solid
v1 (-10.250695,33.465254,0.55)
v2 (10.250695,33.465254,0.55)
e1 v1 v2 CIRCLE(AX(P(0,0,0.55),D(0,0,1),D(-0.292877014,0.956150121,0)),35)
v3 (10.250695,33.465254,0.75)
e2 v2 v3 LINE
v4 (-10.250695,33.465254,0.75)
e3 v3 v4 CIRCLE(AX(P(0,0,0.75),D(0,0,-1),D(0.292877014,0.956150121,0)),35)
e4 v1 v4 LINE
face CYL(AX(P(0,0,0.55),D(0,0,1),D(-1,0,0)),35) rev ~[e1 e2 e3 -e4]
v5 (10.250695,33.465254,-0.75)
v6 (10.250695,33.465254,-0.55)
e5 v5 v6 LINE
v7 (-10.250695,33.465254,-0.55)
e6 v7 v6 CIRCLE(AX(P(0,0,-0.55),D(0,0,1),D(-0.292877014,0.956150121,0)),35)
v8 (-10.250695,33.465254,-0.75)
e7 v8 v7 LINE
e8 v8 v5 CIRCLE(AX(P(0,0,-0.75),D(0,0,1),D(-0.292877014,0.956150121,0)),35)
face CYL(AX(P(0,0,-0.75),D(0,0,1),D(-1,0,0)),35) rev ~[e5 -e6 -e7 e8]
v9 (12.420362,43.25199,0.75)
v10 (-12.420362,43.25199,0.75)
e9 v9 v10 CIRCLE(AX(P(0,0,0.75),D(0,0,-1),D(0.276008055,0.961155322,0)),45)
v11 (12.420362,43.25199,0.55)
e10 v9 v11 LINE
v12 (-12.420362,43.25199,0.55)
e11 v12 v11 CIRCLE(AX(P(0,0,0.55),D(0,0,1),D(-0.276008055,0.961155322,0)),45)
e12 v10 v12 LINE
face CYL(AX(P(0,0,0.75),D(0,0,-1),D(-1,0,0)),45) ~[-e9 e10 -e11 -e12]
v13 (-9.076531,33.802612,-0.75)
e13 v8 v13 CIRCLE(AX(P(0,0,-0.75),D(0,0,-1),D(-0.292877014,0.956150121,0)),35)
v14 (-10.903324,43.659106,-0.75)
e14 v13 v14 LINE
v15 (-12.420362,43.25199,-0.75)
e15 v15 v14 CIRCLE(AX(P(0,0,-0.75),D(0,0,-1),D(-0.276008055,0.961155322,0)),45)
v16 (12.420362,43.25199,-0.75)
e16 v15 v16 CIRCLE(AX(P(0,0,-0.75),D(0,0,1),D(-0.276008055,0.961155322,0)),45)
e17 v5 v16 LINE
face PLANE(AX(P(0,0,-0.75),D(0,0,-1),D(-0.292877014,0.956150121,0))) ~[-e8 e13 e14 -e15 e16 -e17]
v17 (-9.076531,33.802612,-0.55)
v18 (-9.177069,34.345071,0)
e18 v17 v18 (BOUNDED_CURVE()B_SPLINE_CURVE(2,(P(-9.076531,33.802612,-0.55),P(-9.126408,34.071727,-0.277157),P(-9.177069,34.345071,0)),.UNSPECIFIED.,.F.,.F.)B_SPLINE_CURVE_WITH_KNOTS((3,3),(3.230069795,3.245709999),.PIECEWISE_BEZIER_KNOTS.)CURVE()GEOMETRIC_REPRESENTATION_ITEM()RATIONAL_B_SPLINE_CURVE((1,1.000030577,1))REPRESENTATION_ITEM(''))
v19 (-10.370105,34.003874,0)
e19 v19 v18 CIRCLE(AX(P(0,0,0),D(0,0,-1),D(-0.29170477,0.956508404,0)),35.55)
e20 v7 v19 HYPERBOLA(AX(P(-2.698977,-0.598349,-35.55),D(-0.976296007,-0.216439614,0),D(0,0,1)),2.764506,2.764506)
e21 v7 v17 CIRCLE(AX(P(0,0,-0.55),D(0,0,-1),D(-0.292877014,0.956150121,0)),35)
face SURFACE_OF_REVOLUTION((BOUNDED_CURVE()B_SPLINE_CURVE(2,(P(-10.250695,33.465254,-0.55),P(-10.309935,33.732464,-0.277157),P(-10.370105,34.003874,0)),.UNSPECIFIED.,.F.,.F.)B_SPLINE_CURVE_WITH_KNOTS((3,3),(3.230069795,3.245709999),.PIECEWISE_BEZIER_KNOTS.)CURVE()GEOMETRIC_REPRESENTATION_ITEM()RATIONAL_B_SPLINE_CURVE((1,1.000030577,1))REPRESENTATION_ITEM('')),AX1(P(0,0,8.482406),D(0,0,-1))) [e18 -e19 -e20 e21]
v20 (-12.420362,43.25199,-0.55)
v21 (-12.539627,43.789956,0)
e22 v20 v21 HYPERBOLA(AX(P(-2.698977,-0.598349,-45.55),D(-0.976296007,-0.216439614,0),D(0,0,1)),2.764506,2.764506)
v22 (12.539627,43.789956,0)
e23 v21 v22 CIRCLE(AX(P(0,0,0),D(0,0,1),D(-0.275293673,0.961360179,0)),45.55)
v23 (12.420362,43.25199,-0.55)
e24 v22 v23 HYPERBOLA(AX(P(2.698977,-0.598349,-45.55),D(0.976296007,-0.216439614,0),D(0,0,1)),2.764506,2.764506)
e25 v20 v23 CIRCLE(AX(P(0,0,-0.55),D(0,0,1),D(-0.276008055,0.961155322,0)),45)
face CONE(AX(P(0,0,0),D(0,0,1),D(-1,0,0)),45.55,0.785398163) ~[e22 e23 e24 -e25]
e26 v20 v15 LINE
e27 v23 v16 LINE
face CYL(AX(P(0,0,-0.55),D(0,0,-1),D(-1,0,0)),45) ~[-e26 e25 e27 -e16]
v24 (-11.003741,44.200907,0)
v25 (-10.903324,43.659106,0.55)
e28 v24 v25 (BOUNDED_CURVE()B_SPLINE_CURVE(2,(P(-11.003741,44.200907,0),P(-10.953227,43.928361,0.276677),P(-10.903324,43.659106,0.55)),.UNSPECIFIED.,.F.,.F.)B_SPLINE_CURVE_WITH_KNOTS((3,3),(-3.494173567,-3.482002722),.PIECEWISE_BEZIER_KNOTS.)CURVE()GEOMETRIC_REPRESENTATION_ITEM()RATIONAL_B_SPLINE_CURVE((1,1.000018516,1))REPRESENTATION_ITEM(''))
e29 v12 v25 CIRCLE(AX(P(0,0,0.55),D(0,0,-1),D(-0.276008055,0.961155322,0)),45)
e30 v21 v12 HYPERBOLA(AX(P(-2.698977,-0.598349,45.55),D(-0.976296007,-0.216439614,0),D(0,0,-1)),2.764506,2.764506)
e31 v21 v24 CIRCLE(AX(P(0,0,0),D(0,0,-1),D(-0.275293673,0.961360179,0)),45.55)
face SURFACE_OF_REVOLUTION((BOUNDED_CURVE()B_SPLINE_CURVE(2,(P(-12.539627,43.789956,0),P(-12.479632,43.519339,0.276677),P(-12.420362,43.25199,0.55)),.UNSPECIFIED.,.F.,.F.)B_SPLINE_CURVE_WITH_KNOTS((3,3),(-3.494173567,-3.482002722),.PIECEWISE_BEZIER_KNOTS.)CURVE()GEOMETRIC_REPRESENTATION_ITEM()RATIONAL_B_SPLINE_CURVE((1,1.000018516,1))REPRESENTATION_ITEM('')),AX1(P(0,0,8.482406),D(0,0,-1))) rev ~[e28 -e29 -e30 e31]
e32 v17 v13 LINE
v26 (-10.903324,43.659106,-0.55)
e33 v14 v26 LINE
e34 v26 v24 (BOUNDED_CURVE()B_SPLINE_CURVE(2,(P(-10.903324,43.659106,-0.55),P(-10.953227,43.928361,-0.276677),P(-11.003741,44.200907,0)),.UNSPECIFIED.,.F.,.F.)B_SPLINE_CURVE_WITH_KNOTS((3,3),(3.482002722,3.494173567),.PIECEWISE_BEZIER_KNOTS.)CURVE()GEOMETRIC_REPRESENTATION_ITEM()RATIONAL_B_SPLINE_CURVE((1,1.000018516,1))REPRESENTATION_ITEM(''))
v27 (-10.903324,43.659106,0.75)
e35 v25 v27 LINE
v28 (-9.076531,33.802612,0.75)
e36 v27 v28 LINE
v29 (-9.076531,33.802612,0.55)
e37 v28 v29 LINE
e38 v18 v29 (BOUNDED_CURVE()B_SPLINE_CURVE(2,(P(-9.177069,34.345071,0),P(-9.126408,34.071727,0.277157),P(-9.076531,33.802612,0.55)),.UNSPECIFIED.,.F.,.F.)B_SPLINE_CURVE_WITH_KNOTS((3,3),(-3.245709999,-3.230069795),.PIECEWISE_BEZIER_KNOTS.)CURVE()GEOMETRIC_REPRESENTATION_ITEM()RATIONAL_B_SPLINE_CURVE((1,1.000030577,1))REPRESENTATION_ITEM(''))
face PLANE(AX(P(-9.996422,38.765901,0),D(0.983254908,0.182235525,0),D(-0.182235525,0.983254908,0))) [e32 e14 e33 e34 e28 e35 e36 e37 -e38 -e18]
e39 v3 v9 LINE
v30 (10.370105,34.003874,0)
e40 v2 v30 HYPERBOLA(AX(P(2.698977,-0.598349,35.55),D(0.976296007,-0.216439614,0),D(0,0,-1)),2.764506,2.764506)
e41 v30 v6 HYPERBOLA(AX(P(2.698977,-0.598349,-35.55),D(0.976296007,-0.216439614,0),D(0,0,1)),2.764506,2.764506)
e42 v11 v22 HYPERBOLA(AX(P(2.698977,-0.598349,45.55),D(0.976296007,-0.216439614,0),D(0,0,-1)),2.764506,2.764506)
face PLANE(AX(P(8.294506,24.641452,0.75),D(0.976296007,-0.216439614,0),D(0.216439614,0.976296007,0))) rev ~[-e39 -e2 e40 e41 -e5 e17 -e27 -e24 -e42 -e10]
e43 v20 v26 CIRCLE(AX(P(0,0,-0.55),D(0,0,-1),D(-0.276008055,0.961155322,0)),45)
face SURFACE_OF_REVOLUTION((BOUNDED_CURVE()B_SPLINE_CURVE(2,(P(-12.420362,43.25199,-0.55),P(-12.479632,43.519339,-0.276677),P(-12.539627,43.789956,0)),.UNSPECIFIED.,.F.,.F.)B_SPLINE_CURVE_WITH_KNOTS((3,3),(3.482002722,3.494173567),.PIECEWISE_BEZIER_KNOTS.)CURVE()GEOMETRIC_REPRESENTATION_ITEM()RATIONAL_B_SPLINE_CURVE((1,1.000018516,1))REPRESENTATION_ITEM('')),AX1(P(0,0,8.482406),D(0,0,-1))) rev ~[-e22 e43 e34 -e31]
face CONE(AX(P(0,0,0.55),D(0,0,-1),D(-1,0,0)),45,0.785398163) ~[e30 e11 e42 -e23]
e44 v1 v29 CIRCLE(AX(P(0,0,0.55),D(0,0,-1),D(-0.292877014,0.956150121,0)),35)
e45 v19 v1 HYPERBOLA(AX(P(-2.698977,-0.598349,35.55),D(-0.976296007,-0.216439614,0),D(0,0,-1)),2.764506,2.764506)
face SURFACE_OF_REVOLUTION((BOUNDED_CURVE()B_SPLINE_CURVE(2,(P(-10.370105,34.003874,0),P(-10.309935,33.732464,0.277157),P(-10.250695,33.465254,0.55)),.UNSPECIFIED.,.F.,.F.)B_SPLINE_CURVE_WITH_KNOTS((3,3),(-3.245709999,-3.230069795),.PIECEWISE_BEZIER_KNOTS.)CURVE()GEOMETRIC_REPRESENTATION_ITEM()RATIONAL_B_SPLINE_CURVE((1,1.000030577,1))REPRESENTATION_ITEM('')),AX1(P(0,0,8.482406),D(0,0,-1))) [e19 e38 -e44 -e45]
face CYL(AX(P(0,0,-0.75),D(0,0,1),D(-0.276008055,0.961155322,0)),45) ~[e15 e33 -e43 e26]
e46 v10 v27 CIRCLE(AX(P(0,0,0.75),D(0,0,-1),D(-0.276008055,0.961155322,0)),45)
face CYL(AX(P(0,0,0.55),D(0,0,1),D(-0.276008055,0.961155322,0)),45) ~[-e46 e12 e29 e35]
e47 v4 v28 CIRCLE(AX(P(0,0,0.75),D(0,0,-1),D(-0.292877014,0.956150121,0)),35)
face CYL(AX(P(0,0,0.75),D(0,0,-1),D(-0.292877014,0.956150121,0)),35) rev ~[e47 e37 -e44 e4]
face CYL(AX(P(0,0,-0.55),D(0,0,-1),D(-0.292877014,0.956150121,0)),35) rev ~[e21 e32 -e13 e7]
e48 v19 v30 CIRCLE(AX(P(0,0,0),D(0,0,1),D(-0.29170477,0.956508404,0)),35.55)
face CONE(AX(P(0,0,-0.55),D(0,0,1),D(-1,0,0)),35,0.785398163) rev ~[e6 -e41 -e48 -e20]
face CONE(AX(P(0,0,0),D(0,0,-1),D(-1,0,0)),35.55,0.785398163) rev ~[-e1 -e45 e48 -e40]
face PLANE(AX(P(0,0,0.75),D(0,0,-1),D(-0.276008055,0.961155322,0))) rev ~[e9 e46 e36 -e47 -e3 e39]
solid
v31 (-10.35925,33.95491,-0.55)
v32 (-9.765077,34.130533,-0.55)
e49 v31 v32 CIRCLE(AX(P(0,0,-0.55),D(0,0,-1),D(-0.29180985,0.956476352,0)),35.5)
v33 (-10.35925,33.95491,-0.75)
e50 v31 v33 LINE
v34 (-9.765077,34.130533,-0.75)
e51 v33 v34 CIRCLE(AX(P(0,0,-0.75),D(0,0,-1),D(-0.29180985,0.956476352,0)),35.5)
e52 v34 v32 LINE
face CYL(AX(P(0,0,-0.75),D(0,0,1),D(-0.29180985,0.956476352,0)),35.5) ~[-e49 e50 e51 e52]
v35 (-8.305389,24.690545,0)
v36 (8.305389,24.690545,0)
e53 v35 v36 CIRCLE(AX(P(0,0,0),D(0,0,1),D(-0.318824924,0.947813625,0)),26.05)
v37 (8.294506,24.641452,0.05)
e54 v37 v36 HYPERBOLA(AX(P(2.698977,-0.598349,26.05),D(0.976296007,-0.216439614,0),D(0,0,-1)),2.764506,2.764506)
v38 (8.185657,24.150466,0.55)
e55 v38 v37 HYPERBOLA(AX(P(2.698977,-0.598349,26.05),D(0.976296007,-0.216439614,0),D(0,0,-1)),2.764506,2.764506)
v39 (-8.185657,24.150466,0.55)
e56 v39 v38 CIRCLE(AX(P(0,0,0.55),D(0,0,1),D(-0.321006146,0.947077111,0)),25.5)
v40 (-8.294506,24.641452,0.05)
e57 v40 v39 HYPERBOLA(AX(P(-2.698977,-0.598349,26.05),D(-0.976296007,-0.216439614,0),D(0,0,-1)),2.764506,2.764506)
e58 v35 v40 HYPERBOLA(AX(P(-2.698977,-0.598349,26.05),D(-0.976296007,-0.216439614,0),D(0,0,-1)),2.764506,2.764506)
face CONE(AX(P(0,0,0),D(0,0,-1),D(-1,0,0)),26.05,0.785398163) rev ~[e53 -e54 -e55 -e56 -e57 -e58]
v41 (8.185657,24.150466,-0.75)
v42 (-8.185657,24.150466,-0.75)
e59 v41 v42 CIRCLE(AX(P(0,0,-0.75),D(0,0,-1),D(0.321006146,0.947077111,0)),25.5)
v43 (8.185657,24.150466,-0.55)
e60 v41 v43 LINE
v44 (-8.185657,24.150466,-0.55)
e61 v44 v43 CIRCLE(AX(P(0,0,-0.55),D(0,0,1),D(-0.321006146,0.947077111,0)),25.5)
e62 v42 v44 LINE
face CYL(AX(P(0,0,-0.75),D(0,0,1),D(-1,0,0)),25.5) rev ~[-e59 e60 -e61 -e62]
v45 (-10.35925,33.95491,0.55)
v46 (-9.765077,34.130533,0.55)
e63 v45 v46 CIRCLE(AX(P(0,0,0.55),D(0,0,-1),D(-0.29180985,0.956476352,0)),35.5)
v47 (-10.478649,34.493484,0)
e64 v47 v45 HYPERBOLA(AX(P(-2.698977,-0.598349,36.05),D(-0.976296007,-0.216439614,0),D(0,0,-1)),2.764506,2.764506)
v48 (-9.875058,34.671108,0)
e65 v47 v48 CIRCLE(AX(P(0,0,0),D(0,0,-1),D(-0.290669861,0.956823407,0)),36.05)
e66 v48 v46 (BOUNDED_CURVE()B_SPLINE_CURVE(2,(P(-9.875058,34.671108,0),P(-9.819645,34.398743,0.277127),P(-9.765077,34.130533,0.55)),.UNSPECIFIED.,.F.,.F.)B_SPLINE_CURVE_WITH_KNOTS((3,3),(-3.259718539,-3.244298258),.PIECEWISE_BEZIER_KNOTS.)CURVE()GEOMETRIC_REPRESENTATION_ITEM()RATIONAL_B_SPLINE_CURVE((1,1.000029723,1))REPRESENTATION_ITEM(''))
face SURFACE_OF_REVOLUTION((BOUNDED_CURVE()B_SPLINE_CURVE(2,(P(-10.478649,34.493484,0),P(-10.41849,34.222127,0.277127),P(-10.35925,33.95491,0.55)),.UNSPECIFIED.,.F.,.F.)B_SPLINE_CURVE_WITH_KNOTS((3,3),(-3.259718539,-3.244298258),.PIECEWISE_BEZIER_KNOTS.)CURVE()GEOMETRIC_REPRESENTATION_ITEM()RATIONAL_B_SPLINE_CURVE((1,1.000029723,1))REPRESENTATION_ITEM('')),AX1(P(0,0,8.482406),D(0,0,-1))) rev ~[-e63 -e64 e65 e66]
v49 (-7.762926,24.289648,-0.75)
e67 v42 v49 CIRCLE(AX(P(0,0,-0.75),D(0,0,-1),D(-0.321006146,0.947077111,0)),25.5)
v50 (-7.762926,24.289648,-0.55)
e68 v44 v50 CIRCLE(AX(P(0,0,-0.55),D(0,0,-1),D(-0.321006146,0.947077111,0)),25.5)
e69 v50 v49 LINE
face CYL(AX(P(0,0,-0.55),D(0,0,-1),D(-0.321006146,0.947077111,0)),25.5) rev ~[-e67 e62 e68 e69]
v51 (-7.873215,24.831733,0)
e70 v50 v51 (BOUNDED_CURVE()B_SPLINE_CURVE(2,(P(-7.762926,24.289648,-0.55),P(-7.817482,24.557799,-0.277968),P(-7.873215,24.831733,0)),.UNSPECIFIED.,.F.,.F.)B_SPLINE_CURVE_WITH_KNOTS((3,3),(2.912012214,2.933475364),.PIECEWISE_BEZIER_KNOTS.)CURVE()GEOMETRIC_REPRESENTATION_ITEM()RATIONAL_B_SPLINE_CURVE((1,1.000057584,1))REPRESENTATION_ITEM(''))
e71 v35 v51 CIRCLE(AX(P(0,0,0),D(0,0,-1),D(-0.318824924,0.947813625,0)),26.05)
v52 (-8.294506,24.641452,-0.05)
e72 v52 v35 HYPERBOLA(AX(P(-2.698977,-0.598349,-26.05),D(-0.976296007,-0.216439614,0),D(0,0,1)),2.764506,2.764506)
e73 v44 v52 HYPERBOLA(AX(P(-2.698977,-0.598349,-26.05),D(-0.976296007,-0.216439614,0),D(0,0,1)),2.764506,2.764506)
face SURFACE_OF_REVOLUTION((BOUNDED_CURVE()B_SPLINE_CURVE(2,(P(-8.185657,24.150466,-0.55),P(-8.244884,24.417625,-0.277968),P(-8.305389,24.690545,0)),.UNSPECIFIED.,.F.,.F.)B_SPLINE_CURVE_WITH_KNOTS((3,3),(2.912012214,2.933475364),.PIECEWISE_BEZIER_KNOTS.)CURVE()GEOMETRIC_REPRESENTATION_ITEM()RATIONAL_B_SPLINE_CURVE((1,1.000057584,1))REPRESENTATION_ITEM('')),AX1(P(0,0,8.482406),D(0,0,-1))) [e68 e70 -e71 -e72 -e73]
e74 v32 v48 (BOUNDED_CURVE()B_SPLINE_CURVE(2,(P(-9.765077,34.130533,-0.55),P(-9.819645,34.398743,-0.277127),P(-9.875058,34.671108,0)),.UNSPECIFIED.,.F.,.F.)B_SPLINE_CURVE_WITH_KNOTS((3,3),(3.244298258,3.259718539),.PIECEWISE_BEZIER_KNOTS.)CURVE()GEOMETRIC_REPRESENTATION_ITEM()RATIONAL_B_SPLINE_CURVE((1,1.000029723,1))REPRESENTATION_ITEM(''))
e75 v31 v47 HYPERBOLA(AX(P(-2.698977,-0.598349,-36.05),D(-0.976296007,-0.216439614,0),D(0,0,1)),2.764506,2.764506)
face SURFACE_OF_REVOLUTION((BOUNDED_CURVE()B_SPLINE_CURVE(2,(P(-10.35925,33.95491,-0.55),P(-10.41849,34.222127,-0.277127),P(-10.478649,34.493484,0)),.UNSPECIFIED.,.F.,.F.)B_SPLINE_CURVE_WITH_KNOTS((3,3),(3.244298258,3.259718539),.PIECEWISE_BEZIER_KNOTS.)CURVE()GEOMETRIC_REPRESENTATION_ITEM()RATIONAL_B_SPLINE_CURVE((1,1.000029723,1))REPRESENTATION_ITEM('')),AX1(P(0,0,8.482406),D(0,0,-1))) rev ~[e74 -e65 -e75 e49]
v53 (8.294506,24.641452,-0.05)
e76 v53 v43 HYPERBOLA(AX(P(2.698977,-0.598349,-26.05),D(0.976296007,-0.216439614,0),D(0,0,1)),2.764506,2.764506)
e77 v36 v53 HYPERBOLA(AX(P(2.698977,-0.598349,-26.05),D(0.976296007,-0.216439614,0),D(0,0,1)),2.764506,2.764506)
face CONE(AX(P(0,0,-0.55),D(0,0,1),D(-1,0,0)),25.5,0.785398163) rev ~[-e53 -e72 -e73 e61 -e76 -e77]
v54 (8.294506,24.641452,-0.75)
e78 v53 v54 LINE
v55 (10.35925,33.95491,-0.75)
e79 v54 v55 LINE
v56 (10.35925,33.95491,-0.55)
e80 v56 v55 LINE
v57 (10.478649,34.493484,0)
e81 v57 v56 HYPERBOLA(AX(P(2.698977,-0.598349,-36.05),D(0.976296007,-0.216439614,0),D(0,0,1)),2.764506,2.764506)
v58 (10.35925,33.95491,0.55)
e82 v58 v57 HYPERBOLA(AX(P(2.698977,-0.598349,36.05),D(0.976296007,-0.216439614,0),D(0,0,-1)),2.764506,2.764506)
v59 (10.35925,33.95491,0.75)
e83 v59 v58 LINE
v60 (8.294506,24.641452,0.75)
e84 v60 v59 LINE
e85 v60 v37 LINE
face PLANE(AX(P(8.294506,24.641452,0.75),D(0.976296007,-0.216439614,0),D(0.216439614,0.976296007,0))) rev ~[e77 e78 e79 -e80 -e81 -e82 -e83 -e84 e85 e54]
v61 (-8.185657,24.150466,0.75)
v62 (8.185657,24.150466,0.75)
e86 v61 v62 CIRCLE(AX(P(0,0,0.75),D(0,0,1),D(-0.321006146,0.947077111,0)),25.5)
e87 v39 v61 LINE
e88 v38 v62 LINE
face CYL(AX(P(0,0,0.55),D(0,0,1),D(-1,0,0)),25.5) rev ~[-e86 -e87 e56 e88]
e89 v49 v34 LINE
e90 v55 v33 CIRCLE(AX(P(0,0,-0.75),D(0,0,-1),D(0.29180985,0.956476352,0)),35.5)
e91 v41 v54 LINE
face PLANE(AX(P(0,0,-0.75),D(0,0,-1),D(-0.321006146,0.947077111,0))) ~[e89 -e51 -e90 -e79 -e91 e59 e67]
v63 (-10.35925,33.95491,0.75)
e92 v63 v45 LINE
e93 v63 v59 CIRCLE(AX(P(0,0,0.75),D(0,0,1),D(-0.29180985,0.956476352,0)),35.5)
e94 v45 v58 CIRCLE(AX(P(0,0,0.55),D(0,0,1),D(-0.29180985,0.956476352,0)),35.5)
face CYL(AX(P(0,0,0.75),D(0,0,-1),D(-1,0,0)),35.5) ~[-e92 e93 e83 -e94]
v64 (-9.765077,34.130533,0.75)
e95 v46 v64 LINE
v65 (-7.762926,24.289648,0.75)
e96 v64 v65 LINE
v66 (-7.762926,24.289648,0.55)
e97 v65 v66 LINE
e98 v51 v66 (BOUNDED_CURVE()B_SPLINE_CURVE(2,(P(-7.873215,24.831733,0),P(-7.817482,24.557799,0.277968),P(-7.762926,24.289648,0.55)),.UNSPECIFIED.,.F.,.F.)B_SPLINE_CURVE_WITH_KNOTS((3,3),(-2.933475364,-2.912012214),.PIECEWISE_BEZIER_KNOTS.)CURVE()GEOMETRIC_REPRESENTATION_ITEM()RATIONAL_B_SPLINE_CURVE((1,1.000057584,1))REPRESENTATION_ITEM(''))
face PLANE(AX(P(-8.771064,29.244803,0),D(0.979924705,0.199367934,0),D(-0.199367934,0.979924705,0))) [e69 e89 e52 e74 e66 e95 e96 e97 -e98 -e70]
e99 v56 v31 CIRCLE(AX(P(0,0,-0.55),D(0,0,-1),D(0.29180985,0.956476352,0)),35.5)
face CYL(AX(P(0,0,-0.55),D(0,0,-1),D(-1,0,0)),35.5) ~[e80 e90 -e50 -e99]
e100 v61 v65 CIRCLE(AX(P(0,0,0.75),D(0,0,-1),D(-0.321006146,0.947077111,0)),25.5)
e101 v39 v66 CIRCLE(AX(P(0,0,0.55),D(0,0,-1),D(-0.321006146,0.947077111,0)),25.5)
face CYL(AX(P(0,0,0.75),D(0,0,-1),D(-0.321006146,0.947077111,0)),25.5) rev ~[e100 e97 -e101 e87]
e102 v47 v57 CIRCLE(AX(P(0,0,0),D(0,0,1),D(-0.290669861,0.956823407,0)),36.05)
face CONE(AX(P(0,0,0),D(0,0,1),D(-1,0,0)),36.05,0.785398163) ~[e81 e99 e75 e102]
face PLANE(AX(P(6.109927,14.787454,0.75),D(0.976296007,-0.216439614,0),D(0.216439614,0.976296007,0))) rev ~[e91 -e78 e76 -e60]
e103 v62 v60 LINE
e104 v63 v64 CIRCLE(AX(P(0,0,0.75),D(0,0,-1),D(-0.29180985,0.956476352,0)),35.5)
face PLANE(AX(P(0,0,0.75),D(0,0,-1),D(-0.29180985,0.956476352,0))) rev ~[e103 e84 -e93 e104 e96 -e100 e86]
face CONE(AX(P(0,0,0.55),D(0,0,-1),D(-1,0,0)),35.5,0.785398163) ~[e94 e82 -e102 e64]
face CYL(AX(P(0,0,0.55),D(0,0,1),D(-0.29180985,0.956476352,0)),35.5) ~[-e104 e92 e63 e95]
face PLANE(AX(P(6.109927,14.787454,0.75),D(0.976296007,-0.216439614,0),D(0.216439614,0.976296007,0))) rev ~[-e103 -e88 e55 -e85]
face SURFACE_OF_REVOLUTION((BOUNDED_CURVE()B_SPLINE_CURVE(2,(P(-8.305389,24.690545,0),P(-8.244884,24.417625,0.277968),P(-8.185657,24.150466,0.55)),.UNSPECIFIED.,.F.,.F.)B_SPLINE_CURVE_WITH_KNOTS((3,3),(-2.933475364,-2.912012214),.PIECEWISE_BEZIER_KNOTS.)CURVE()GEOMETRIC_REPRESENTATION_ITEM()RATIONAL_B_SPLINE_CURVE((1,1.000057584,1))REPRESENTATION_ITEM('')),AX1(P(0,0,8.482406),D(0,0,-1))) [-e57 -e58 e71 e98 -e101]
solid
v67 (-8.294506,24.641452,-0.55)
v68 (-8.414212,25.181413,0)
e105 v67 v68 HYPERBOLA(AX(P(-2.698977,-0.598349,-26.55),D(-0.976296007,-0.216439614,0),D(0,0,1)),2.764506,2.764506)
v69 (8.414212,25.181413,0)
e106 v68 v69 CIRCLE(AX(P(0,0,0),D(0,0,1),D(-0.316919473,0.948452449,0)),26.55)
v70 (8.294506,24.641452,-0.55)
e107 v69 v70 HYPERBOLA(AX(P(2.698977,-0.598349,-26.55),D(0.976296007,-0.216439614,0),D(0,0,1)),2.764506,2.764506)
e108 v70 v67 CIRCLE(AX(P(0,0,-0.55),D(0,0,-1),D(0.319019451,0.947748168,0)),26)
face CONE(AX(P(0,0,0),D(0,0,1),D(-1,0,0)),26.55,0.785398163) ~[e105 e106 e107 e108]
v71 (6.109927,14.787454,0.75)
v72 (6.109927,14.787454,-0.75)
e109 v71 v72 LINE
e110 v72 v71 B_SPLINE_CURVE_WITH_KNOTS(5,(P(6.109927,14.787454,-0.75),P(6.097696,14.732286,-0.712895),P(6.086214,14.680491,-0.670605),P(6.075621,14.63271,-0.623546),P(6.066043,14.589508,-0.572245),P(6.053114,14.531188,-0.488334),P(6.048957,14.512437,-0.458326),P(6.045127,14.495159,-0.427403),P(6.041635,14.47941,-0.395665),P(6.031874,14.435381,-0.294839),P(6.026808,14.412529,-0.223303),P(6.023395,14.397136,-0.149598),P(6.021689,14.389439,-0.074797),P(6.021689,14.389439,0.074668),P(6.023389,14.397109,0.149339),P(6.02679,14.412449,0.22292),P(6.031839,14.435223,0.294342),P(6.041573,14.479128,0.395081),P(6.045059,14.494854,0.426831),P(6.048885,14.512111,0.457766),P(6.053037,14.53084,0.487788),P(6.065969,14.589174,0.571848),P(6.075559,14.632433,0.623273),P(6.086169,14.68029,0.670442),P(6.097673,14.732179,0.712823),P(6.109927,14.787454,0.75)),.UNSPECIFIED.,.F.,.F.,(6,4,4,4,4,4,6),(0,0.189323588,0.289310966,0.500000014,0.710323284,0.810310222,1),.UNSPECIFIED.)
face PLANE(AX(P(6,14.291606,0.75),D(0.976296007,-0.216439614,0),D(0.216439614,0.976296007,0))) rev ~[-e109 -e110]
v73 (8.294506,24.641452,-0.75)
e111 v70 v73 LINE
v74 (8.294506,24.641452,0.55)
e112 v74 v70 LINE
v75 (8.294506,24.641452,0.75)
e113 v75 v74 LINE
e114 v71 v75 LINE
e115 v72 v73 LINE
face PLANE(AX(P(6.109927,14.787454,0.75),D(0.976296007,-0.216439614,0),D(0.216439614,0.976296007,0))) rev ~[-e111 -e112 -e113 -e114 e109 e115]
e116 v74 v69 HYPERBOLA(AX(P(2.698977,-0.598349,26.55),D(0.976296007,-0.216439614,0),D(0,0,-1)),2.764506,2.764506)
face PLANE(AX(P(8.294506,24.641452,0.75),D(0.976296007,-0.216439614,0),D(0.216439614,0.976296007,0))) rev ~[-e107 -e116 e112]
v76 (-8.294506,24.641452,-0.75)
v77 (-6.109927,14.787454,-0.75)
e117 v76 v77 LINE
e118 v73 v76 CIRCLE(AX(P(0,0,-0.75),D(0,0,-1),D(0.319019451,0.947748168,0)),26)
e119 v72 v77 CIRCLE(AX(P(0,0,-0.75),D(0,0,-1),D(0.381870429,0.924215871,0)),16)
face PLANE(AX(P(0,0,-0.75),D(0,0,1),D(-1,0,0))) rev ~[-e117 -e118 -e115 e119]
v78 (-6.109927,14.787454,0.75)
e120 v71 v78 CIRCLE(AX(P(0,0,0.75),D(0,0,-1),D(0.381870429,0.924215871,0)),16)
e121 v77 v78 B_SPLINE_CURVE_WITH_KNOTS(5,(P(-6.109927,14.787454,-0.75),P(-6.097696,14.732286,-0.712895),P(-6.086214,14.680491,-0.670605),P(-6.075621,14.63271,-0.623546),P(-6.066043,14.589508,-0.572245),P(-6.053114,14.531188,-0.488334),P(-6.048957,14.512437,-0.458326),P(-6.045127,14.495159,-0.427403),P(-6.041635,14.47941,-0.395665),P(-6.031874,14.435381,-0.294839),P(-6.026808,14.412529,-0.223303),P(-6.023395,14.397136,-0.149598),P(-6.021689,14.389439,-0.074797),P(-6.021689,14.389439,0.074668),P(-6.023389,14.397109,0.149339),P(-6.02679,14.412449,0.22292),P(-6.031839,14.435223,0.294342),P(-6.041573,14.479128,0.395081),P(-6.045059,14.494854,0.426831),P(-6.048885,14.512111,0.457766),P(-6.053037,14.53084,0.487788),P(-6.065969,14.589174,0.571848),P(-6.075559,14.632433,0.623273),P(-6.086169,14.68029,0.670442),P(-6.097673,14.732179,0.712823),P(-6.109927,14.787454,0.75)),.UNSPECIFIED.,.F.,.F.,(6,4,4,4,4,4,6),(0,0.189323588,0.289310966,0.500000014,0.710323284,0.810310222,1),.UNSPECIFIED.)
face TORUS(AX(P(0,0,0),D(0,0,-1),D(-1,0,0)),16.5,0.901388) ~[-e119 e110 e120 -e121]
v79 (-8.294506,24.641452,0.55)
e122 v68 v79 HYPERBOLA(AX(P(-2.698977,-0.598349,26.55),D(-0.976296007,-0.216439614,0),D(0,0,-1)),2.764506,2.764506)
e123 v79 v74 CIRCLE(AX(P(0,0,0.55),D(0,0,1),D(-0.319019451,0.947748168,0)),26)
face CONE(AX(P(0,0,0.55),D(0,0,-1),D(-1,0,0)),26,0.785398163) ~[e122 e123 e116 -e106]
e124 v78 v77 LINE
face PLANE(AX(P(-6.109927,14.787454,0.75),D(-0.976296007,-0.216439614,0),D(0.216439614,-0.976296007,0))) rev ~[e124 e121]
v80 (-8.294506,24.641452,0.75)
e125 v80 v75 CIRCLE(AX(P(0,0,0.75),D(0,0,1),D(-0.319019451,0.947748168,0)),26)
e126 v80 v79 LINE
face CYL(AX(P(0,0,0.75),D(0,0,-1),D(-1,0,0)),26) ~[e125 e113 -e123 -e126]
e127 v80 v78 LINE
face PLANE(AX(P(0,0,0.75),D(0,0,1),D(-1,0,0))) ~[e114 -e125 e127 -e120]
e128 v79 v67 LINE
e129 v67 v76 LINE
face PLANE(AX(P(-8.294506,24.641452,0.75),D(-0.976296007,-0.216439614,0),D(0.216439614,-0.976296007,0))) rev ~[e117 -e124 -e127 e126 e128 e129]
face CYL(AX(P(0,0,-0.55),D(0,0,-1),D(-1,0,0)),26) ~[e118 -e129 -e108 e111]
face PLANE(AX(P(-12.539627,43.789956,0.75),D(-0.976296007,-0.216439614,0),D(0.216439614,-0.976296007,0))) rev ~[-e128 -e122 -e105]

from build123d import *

# Parameters (mm, degrees)
F5_DEPTH = 1.5
F6_ANGLE = 1
F7_ANGLE = 2


with BuildPart() as f1:
    # F0 (on Front) → F1 (revolve)
    with BuildSketch(Plane.XZ):
        with BuildLine():
            Line((-16, 0.75), (-25.5, 0.75))
            Line((-25.5, 0.75), (-25.5, 0.55))
            Line((-25.5, 0.55), (-26.05, 0))
            Line((-26.05, 0), (-25.5, -0.55))
            Line((-25.5, -0.55), (-25.5, -0.75))
            Line((-25.5, -0.75), (-16, -0.75))
            ThreePointArc((-16, -0.75), (-15.5986121811, 0), (-16, 0.75))
        make_face()
        Polygon((-25.5, 0.75), (-26, 0.75), (-26, 0.55), (-26.55, 0), (-26, -0.55), (-26, -0.75), (-25.5, -0.75), (-25.5, -0.55), (-26.05, 0), (-25.5, 0.55), align=None)
    revolve(axis=Axis((0, 0, 8.4824059159), (0, 0, 1)))


with BuildPart() as f2:
    # F0 (on Front) → F2 (revolve)
    with BuildSketch(Plane.XZ):
        Polygon((-26, 0.75), (-35, 0.75), (-35, 0.55), (-35.55, 0), (-35, -0.55), (-35, -0.75), (-26, -0.75), (-26, -0.55), (-26.55, 0), (-26, 0.55), align=None)
        Polygon((-25.5, 0.75), (-26, 0.75), (-26, 0.55), (-26.55, 0), (-26, -0.55), (-26, -0.75), (-25.5, -0.75), (-25.5, -0.55), (-26.05, 0), (-25.5, 0.55), align=None)
        Polygon((-35, 0.75), (-35.5, 0.75), (-35.5, 0.55), (-36.05, 0), (-35.5, -0.55), (-35.5, -0.75), (-35, -0.75), (-35, -0.55), (-35.55, 0), (-35, 0.55), align=None)
    revolve(axis=Axis((0, 0, 8.4824059159), (0, 0, 1)))


with BuildPart() as f3:
    # F0 (on Front) → F3 (revolve)
    with BuildSketch(Plane.XZ):
        Polygon((-35.5, 0.75), (-45, 0.75), (-45, 0.55), (-45.55, 0), (-45, -0.55), (-45, -0.75), (-35.5, -0.75), (-35.5, -0.55), (-36.05, 0), (-35.5, 0.55), align=None)
        Polygon((-35, 0.75), (-35.5, 0.75), (-35.5, 0.55), (-36.05, 0), (-35.5, -0.55), (-35.5, -0.75), (-35, -0.75), (-35, -0.55), (-35.55, 0), (-35, 0.55), align=None)
    revolve(axis=Axis((0, 0, 8.4824059159), (0, 0, 1)))


with BuildPart() as f5_tool:
    # F4 (on face) → F5 (new body, through all)
    with BuildSketch(Plane.XY.offset(0.75)):
        with BuildLine():
            Line((-8.2945057155, 24.6414523707), (-6.1099268561, 14.7874539327))
            ThreePointArc((-6.1099268561, 14.7874539327), (0, 16), (6.1099268561, 14.7874539327))
            Line((6.1099268561, 14.7874539327), (8.2945057155, 24.6414523707))
            ThreePointArc((8.2945057155, 24.6414523707), (0, 26), (-8.2945057155, 24.6414523707))
        make_face()
        with BuildLine():
            Line((-6.1099268561, 14.7874539327), (-6, 14.291605928))
            ThreePointArc((-6, 14.291605928), (0, 15.5), (6, 14.291605928))
            Line((6, 14.291605928), (6.1099268561, 14.7874539327))
            ThreePointArc((6.1099268561, 14.7874539327), (0, 16), (-6.1099268561, 14.7874539327))
        make_face()
        with BuildLine():
            Line((-12.5396268012, 43.7899561508), (-8.2945057155, 24.6414523707))
            ThreePointArc((-8.2945057155, 24.6414523707), (0, 26), (8.2945057155, 24.6414523707))
            Line((8.2945057155, 24.6414523707), (12.5396268012, 43.7899561508))
            ThreePointArc((12.5396268012, 43.7899561508), (0, 45.55), (-12.5396268012, 43.7899561508))
        make_face()
    extrude(amount=-F5_DEPTH)


with BuildPart() as f1_1:
    add(f1.part)

    # F5: cut by f5_tool
    add(f5_tool.part, mode=Mode.SUBTRACT)


with BuildPart() as f2_1:
    add(f2.part)

    # F5: cut by f5_tool
    add(f5_tool.part, mode=Mode.SUBTRACT)

    # F5_face (on face) → F6 (revolve)
    with BuildSketch(Plane(origin=(-9.3162931707, 29.2504377339, 0), x_dir=(-0.2164396139, 0.9762960071, 0), z_dir=(0.9762960071, 0.2164396139, 0))):
        with BuildLine():
            Line((4.8186950678, 0.75), (-5.223796234, 0.75))
            Line((-5.223796234, 0.75), (-5.223796234, 0.55))
            add(Edge.make_bspline(
                [(-4.6706047852, 0), (-4.9501515794, 0.2779681938), (-5.223796234, 0.55)],
                knots=[-2.9334753636, -2.9334753636, -2.9334753636, -2.9120122138, -2.9120122138, -2.9120122138], degree=2, weights=[1, 1.0000575839, 1]))
            add(Edge.make_bspline(
                [(-5.223796234, -0.55), (-4.9501515794, -0.2779681938), (-4.6706047852, 0)],
                knots=[2.9120122138, 2.9120122138, 2.9120122138, 2.9334753636, 2.9334753636, 2.9334753636], degree=2, weights=[1, 1.0000575839, 1]))
            Line((-5.223796234, -0.55), (-5.223796234, -0.75))
            Line((-5.223796234, -0.75), (4.8186950678, -0.75))
            Line((4.8186950678, -0.75), (4.8186950678, -0.55))
            add(Edge.make_bspline(
                [(4.8186950678, -0.55), (5.092399633, -0.2771266059), (5.3703446915, 0)],
                knots=[3.2442982582, 3.2442982582, 3.2442982582, 3.2597185393, 3.2597185393, 3.2597185393], degree=2, weights=[1, 1.0000297233, 1]))
            add(Edge.make_bspline(
                [(5.3703446915, 0), (5.092399633, 0.2771266059), (4.8186950678, 0.55)],
                knots=[-3.2597185393, -3.2597185393, -3.2597185393, -3.2442982582, -3.2442982582, -3.2442982582], degree=2, weights=[1, 1.0000297233, 1]))
            Line((4.8186950678, 0.55), (4.8186950678, 0.75))
        make_face()
    revolve(axis=Axis((0, 0, 8.4824059159), (0, 0, -1)), revolution_arc=F6_ANGLE)


with BuildPart() as f3_1:
    add(f3.part)

    # F5: cut by f5_tool
    add(f5_tool.part, mode=Mode.SUBTRACT)

    # F5_face (on face) → F7 (revolve)
    with BuildSketch(Plane(origin=(-9.3162931707, 29.2504377339, 0), x_dir=(-0.2164396139, 0.9762960071, 0), z_dir=(0.9762960071, 0.2164396139, 0))):
        with BuildLine():
            add(Edge.make_bspline(
                [(14.8925308624, 0), (14.6153432848, 0.2766765991), (14.3415026483, 0.55)],
                knots=[-3.4941735673, -3.4941735673, -3.4941735673, -3.4820027221, -3.4820027221, -3.4820027221], degree=2, weights=[1, 1.0000185162, 1]))
            Line((14.3415026483, 0.55), (14.3415026483, 0.75))
            Line((14.3415026483, 0.75), (4.3171502115, 0.75))
            Line((4.3171502115, 0.75), (4.3171502115, 0.55))
            add(Edge.make_bspline(
                [(4.8688471524, 0), (4.5908481978, 0.2771571192), (4.3171502115, 0.55)],
                knots=[-3.245709999, -3.245709999, -3.245709999, -3.2300697953, -3.2300697953, -3.2300697953], degree=2, weights=[1, 1.0000305772, 1]))
            add(Edge.make_bspline(
                [(4.3171502115, -0.55), (4.5908481978, -0.2771571192), (4.8688471524, 0)],
                knots=[3.2300697953, 3.2300697953, 3.2300697953, 3.245709999, 3.245709999, 3.245709999], degree=2, weights=[1, 1.0000305772, 1]))
            Line((4.3171502115, -0.55), (4.3171502115, -0.75))
            Line((4.3171502115, -0.75), (14.3415026483, -0.75))
            Line((14.3415026483, -0.75), (14.3415026483, -0.55))
            add(Edge.make_bspline(
                [(14.3415026483, -0.55), (14.6153432848, -0.2766765991), (14.8925308624, 0)],
                knots=[3.4820027221, 3.4820027221, 3.4820027221, 3.4941735673, 3.4941735673, 3.4941735673], degree=2, weights=[1, 1.0000185162, 1]))
        make_face()
    revolve(axis=Axis((0, 0, 8.4824059159), (0, 0, -1)), revolution_arc=F7_ANGLE)


solid = Compound([f1_1.part, f2_1.part, f3_1.part])
